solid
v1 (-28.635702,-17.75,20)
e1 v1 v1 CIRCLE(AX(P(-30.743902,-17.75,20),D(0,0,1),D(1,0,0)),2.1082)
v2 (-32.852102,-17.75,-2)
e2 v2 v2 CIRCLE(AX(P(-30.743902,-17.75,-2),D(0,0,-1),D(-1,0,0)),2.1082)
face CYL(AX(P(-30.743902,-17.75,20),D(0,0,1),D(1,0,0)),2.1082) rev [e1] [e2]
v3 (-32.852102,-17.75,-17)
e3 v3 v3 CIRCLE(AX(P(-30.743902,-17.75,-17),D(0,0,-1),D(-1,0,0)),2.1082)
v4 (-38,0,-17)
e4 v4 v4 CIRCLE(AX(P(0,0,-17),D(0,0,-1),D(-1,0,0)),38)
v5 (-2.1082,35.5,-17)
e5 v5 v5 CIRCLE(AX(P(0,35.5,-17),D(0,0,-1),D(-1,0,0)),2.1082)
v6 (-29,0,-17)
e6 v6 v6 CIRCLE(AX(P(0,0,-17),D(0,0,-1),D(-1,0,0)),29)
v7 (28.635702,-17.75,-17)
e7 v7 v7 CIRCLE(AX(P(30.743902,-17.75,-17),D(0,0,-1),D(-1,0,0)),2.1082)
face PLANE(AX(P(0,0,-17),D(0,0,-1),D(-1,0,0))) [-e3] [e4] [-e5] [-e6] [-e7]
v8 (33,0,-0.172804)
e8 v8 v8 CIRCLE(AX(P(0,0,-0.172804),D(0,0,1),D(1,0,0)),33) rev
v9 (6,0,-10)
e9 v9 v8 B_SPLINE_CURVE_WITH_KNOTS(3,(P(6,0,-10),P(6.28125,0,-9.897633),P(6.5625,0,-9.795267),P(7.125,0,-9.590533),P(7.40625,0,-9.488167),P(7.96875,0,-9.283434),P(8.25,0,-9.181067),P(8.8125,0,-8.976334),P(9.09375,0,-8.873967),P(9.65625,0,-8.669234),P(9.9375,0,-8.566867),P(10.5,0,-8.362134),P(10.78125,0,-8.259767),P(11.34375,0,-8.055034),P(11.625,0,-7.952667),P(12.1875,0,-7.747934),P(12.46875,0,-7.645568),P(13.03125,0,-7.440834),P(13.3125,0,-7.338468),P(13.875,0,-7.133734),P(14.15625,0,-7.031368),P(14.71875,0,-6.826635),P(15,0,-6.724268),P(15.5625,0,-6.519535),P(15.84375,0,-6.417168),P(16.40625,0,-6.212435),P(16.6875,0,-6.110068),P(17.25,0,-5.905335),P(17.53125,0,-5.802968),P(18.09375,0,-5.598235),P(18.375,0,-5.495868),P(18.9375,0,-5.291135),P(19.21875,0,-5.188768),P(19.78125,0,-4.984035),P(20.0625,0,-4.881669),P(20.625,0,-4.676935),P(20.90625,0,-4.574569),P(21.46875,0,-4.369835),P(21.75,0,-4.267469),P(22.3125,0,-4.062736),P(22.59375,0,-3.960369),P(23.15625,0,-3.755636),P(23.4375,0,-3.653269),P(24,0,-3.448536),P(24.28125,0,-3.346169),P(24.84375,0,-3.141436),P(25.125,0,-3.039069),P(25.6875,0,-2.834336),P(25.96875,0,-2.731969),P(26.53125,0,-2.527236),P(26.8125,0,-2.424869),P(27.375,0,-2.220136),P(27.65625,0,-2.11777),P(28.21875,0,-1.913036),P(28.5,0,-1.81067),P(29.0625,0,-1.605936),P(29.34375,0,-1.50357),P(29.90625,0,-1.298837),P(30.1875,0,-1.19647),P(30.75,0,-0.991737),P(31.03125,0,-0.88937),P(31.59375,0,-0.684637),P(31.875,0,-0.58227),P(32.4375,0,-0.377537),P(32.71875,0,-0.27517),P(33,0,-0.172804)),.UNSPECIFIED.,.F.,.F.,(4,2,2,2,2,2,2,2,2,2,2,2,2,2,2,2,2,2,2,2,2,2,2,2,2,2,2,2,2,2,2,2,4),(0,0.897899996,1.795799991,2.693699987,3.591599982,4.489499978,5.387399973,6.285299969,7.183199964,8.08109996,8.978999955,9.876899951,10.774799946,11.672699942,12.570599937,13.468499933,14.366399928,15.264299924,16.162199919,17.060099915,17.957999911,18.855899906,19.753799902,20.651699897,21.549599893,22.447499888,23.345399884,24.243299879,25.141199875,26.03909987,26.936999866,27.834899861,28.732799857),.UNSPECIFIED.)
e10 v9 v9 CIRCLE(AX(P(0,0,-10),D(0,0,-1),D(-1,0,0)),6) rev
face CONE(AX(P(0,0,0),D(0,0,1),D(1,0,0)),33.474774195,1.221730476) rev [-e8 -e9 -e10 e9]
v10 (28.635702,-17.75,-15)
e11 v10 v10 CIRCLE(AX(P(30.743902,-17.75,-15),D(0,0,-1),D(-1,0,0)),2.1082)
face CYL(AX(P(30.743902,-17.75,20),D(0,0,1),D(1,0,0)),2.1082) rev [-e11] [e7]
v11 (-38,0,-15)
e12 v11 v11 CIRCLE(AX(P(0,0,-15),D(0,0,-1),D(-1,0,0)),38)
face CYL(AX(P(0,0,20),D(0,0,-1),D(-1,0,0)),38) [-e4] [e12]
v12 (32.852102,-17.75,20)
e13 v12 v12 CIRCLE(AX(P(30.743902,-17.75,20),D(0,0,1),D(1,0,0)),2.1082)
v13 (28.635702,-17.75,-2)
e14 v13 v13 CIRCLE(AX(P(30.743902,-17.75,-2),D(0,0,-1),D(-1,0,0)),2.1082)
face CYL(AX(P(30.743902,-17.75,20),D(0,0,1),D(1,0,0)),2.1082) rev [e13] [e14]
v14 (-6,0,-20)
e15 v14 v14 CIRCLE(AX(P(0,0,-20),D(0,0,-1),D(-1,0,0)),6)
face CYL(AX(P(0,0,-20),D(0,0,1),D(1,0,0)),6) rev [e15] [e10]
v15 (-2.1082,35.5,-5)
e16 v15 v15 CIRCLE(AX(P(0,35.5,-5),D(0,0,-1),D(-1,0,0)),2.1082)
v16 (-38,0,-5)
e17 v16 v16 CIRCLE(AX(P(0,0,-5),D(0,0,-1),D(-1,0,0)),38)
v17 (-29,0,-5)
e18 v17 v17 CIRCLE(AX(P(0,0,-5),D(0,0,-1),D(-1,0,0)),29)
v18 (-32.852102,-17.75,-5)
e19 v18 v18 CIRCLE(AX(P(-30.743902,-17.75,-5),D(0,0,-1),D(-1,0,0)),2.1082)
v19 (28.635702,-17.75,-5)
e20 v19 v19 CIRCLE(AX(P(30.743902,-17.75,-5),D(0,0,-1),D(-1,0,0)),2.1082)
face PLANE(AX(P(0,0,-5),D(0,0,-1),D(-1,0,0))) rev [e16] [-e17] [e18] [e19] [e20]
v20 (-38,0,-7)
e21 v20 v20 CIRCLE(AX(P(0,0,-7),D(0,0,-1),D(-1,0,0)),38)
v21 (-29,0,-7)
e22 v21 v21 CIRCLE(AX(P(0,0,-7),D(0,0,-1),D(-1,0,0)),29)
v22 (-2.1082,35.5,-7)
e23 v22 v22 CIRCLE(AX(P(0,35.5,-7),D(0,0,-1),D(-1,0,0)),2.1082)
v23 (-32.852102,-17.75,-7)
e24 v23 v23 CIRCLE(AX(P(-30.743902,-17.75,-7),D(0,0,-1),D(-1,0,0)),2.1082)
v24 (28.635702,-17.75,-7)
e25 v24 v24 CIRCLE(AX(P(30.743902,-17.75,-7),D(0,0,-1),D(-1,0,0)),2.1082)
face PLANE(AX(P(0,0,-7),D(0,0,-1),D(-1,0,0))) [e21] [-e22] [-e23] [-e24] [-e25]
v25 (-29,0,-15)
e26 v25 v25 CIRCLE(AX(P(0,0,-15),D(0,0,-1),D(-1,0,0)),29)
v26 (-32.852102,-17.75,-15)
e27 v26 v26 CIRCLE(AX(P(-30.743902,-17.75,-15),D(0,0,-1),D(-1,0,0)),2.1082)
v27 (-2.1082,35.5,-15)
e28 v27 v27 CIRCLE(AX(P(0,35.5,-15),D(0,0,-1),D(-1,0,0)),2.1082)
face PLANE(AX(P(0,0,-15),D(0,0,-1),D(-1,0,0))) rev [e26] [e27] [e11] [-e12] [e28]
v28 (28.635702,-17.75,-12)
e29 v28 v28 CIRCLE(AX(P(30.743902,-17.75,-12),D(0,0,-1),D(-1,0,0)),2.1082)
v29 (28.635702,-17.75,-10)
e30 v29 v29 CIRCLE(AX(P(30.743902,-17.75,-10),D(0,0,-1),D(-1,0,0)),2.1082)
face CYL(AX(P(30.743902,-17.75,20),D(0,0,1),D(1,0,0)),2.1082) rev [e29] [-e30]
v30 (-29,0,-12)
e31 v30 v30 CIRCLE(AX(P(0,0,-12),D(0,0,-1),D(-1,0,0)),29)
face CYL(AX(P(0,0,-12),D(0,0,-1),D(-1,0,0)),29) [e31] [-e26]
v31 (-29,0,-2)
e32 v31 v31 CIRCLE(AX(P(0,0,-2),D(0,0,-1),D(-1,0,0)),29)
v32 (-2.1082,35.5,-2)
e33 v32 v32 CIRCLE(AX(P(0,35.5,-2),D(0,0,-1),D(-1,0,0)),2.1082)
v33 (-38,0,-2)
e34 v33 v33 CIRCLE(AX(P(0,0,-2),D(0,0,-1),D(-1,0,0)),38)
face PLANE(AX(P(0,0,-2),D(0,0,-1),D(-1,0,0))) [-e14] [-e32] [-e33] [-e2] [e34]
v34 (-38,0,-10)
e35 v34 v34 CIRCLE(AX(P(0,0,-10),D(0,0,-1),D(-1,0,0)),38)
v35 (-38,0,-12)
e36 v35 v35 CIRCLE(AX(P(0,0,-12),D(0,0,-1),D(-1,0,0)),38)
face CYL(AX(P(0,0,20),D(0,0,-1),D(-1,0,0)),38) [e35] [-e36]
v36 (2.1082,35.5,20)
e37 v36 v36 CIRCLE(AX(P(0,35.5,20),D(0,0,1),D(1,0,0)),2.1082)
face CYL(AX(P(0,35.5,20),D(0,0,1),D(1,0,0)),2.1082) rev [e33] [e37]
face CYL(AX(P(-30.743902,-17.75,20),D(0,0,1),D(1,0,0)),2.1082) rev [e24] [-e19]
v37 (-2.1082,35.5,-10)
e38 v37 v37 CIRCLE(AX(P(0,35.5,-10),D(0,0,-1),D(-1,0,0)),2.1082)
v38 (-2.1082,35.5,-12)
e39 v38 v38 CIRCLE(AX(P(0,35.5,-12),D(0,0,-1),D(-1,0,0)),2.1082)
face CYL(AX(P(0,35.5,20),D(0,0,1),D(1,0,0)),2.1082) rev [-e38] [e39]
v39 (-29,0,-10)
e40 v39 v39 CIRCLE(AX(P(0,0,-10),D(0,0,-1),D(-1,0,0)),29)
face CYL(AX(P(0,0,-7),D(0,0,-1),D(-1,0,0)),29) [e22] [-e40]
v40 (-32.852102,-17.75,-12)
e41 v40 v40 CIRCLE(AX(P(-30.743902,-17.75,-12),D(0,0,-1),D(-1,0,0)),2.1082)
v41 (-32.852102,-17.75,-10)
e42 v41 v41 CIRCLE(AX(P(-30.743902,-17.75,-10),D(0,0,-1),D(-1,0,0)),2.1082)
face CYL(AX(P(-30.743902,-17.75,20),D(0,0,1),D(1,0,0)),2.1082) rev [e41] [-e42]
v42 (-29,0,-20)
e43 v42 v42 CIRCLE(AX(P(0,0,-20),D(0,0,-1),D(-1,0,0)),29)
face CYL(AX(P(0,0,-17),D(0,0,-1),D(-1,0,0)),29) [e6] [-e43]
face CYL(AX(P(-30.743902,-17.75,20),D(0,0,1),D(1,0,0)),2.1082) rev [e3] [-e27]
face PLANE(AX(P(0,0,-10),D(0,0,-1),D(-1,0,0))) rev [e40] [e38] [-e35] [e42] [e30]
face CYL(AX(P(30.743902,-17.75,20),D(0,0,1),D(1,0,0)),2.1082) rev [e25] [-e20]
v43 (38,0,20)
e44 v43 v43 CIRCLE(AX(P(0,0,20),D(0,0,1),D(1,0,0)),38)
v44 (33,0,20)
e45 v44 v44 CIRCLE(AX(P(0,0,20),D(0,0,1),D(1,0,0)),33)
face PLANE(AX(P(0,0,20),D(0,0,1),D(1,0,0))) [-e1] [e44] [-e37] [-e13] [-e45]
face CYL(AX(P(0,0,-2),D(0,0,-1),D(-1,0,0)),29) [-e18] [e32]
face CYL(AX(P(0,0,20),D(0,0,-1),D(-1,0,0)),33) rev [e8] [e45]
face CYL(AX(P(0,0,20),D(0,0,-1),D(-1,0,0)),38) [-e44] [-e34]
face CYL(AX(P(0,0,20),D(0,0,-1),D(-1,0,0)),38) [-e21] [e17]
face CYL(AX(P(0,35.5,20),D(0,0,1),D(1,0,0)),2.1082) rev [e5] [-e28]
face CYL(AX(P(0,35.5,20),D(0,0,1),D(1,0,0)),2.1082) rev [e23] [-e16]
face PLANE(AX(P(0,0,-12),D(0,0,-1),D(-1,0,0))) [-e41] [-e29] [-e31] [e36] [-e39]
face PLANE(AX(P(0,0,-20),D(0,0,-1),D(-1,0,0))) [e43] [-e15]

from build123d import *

# Parameters (mm, degrees)
SKETCH1_R                     = 38
SKETCH1_R_2                   = 33
BOSS_EXTRUDE1_DEPTH           = 20
BOSS_EXTRUDE2_START           = 20
SKETCH4_R                     = 38
SKETCH4_R_2                   = 6
BOSS_EXTRUDE2_DEPTH           = 20
CHAMFER1_SIZE                 = 10
CHAMFER1_SIZE_2               = 27.474774195
SKETCH5_R                     = 38
SKETCH5_R_2                   = 29
CUT_EXTRUDE1_DEPTH            = 3
LPATTERN1_COUNT               = 4
LPATTERN1_PITCH               = 5
HOLE_FOR_4_300_SC_NUTS_SP_1_D = 4.2164
CIRPATTERN1_COUNT             = 3


with BuildPart() as part:
    # Sketch1 → Boss-Extrude1 (new body)
    with BuildSketch(Plane.XY):
        Circle(SKETCH1_R)
        Circle(SKETCH1_R_2, mode=Mode.SUBTRACT)
    extrude(amount=BOSS_EXTRUDE1_DEPTH)

    # Sketch4 → Boss-Extrude2 (add)
    with BuildSketch(Plane(origin=(0, 0, 0), x_dir=(-1, 0, 0), z_dir=(0, 0, -1)).offset(BOSS_EXTRUDE2_START)):
        Circle(SKETCH4_R)
        Circle(SKETCH4_R_2, mode=Mode.SUBTRACT)
    extrude(amount=-BOSS_EXTRUDE2_DEPTH)

    # Chamfer1
    # the kernel refuses this chamfer: 27.474774195, 10 mm, written as the material it takes off along each edge
    with BuildSketch(Plane(origin=(0, 0, 0), x_dir=(-1, 0, 0), z_dir=(0, -1, 0))) as chamfer1_piece_1_section:
        Polygon((6, CHAMFER1_SIZE), (6 + CHAMFER1_SIZE_2, 0), (6, 0), align=None)
    chamfer1_piece_1 = revolve(axis=Axis((0, 0, 0), (0, 0, -1)), mode=Mode.PRIVATE)
    chamfer1_piece_1 = chamfer1_piece_1 & Plane(origin=(0, 0, -5.040402046), x_dir=(1, 0, 0), z_dir=(0, 0, -1)) * Cylinder(33, 134, mode=Mode.PRIVATE)
    add(chamfer1_piece_1, mode=Mode.SUBTRACT)

    # Sketch5 → Cut-Extrude1 (cut)
    with BuildSketch(Plane(origin=(0, 0, -20), x_dir=(-1, 0, 0), z_dir=(0, 0, -1))):
        Circle(SKETCH5_R)
        Circle(SKETCH5_R_2, mode=Mode.SUBTRACT)
    cut_extrude1 = extrude(amount=-CUT_EXTRUDE1_DEPTH, mode=Mode.SUBTRACT)

    # LPattern1: Cut-Extrude1 ×4
    with Locations(*[(0, 0, i * LPATTERN1_PITCH) for i in range(1, LPATTERN1_COUNT)]):
        add(cut_extrude1, mode=Mode.SUBTRACT)

    # Hole for #4 300® SC Nuts (SP)1 (through all)
    with Locations(Plane.XY.offset(20)):
        with Locations((0, 35.5)):
            hole_for_4_300_sc_nuts_sp_1 = Hole(HOLE_FOR_4_300_SC_NUTS_SP_1_D / 2)

    # CirPattern1: Hole for #4 300® SC Nuts (SP)1 ×3 about axis
    cirpattern1_axis = Axis((0, 0, 0), (0, 0, 1))
    for i in range(1, CIRPATTERN1_COUNT):
        add(hole_for_4_300_sc_nuts_sp_1.rotate(cirpattern1_axis, i * 360 / CIRPATTERN1_COUNT), mode=Mode.SUBTRACT)


solid = part.part
